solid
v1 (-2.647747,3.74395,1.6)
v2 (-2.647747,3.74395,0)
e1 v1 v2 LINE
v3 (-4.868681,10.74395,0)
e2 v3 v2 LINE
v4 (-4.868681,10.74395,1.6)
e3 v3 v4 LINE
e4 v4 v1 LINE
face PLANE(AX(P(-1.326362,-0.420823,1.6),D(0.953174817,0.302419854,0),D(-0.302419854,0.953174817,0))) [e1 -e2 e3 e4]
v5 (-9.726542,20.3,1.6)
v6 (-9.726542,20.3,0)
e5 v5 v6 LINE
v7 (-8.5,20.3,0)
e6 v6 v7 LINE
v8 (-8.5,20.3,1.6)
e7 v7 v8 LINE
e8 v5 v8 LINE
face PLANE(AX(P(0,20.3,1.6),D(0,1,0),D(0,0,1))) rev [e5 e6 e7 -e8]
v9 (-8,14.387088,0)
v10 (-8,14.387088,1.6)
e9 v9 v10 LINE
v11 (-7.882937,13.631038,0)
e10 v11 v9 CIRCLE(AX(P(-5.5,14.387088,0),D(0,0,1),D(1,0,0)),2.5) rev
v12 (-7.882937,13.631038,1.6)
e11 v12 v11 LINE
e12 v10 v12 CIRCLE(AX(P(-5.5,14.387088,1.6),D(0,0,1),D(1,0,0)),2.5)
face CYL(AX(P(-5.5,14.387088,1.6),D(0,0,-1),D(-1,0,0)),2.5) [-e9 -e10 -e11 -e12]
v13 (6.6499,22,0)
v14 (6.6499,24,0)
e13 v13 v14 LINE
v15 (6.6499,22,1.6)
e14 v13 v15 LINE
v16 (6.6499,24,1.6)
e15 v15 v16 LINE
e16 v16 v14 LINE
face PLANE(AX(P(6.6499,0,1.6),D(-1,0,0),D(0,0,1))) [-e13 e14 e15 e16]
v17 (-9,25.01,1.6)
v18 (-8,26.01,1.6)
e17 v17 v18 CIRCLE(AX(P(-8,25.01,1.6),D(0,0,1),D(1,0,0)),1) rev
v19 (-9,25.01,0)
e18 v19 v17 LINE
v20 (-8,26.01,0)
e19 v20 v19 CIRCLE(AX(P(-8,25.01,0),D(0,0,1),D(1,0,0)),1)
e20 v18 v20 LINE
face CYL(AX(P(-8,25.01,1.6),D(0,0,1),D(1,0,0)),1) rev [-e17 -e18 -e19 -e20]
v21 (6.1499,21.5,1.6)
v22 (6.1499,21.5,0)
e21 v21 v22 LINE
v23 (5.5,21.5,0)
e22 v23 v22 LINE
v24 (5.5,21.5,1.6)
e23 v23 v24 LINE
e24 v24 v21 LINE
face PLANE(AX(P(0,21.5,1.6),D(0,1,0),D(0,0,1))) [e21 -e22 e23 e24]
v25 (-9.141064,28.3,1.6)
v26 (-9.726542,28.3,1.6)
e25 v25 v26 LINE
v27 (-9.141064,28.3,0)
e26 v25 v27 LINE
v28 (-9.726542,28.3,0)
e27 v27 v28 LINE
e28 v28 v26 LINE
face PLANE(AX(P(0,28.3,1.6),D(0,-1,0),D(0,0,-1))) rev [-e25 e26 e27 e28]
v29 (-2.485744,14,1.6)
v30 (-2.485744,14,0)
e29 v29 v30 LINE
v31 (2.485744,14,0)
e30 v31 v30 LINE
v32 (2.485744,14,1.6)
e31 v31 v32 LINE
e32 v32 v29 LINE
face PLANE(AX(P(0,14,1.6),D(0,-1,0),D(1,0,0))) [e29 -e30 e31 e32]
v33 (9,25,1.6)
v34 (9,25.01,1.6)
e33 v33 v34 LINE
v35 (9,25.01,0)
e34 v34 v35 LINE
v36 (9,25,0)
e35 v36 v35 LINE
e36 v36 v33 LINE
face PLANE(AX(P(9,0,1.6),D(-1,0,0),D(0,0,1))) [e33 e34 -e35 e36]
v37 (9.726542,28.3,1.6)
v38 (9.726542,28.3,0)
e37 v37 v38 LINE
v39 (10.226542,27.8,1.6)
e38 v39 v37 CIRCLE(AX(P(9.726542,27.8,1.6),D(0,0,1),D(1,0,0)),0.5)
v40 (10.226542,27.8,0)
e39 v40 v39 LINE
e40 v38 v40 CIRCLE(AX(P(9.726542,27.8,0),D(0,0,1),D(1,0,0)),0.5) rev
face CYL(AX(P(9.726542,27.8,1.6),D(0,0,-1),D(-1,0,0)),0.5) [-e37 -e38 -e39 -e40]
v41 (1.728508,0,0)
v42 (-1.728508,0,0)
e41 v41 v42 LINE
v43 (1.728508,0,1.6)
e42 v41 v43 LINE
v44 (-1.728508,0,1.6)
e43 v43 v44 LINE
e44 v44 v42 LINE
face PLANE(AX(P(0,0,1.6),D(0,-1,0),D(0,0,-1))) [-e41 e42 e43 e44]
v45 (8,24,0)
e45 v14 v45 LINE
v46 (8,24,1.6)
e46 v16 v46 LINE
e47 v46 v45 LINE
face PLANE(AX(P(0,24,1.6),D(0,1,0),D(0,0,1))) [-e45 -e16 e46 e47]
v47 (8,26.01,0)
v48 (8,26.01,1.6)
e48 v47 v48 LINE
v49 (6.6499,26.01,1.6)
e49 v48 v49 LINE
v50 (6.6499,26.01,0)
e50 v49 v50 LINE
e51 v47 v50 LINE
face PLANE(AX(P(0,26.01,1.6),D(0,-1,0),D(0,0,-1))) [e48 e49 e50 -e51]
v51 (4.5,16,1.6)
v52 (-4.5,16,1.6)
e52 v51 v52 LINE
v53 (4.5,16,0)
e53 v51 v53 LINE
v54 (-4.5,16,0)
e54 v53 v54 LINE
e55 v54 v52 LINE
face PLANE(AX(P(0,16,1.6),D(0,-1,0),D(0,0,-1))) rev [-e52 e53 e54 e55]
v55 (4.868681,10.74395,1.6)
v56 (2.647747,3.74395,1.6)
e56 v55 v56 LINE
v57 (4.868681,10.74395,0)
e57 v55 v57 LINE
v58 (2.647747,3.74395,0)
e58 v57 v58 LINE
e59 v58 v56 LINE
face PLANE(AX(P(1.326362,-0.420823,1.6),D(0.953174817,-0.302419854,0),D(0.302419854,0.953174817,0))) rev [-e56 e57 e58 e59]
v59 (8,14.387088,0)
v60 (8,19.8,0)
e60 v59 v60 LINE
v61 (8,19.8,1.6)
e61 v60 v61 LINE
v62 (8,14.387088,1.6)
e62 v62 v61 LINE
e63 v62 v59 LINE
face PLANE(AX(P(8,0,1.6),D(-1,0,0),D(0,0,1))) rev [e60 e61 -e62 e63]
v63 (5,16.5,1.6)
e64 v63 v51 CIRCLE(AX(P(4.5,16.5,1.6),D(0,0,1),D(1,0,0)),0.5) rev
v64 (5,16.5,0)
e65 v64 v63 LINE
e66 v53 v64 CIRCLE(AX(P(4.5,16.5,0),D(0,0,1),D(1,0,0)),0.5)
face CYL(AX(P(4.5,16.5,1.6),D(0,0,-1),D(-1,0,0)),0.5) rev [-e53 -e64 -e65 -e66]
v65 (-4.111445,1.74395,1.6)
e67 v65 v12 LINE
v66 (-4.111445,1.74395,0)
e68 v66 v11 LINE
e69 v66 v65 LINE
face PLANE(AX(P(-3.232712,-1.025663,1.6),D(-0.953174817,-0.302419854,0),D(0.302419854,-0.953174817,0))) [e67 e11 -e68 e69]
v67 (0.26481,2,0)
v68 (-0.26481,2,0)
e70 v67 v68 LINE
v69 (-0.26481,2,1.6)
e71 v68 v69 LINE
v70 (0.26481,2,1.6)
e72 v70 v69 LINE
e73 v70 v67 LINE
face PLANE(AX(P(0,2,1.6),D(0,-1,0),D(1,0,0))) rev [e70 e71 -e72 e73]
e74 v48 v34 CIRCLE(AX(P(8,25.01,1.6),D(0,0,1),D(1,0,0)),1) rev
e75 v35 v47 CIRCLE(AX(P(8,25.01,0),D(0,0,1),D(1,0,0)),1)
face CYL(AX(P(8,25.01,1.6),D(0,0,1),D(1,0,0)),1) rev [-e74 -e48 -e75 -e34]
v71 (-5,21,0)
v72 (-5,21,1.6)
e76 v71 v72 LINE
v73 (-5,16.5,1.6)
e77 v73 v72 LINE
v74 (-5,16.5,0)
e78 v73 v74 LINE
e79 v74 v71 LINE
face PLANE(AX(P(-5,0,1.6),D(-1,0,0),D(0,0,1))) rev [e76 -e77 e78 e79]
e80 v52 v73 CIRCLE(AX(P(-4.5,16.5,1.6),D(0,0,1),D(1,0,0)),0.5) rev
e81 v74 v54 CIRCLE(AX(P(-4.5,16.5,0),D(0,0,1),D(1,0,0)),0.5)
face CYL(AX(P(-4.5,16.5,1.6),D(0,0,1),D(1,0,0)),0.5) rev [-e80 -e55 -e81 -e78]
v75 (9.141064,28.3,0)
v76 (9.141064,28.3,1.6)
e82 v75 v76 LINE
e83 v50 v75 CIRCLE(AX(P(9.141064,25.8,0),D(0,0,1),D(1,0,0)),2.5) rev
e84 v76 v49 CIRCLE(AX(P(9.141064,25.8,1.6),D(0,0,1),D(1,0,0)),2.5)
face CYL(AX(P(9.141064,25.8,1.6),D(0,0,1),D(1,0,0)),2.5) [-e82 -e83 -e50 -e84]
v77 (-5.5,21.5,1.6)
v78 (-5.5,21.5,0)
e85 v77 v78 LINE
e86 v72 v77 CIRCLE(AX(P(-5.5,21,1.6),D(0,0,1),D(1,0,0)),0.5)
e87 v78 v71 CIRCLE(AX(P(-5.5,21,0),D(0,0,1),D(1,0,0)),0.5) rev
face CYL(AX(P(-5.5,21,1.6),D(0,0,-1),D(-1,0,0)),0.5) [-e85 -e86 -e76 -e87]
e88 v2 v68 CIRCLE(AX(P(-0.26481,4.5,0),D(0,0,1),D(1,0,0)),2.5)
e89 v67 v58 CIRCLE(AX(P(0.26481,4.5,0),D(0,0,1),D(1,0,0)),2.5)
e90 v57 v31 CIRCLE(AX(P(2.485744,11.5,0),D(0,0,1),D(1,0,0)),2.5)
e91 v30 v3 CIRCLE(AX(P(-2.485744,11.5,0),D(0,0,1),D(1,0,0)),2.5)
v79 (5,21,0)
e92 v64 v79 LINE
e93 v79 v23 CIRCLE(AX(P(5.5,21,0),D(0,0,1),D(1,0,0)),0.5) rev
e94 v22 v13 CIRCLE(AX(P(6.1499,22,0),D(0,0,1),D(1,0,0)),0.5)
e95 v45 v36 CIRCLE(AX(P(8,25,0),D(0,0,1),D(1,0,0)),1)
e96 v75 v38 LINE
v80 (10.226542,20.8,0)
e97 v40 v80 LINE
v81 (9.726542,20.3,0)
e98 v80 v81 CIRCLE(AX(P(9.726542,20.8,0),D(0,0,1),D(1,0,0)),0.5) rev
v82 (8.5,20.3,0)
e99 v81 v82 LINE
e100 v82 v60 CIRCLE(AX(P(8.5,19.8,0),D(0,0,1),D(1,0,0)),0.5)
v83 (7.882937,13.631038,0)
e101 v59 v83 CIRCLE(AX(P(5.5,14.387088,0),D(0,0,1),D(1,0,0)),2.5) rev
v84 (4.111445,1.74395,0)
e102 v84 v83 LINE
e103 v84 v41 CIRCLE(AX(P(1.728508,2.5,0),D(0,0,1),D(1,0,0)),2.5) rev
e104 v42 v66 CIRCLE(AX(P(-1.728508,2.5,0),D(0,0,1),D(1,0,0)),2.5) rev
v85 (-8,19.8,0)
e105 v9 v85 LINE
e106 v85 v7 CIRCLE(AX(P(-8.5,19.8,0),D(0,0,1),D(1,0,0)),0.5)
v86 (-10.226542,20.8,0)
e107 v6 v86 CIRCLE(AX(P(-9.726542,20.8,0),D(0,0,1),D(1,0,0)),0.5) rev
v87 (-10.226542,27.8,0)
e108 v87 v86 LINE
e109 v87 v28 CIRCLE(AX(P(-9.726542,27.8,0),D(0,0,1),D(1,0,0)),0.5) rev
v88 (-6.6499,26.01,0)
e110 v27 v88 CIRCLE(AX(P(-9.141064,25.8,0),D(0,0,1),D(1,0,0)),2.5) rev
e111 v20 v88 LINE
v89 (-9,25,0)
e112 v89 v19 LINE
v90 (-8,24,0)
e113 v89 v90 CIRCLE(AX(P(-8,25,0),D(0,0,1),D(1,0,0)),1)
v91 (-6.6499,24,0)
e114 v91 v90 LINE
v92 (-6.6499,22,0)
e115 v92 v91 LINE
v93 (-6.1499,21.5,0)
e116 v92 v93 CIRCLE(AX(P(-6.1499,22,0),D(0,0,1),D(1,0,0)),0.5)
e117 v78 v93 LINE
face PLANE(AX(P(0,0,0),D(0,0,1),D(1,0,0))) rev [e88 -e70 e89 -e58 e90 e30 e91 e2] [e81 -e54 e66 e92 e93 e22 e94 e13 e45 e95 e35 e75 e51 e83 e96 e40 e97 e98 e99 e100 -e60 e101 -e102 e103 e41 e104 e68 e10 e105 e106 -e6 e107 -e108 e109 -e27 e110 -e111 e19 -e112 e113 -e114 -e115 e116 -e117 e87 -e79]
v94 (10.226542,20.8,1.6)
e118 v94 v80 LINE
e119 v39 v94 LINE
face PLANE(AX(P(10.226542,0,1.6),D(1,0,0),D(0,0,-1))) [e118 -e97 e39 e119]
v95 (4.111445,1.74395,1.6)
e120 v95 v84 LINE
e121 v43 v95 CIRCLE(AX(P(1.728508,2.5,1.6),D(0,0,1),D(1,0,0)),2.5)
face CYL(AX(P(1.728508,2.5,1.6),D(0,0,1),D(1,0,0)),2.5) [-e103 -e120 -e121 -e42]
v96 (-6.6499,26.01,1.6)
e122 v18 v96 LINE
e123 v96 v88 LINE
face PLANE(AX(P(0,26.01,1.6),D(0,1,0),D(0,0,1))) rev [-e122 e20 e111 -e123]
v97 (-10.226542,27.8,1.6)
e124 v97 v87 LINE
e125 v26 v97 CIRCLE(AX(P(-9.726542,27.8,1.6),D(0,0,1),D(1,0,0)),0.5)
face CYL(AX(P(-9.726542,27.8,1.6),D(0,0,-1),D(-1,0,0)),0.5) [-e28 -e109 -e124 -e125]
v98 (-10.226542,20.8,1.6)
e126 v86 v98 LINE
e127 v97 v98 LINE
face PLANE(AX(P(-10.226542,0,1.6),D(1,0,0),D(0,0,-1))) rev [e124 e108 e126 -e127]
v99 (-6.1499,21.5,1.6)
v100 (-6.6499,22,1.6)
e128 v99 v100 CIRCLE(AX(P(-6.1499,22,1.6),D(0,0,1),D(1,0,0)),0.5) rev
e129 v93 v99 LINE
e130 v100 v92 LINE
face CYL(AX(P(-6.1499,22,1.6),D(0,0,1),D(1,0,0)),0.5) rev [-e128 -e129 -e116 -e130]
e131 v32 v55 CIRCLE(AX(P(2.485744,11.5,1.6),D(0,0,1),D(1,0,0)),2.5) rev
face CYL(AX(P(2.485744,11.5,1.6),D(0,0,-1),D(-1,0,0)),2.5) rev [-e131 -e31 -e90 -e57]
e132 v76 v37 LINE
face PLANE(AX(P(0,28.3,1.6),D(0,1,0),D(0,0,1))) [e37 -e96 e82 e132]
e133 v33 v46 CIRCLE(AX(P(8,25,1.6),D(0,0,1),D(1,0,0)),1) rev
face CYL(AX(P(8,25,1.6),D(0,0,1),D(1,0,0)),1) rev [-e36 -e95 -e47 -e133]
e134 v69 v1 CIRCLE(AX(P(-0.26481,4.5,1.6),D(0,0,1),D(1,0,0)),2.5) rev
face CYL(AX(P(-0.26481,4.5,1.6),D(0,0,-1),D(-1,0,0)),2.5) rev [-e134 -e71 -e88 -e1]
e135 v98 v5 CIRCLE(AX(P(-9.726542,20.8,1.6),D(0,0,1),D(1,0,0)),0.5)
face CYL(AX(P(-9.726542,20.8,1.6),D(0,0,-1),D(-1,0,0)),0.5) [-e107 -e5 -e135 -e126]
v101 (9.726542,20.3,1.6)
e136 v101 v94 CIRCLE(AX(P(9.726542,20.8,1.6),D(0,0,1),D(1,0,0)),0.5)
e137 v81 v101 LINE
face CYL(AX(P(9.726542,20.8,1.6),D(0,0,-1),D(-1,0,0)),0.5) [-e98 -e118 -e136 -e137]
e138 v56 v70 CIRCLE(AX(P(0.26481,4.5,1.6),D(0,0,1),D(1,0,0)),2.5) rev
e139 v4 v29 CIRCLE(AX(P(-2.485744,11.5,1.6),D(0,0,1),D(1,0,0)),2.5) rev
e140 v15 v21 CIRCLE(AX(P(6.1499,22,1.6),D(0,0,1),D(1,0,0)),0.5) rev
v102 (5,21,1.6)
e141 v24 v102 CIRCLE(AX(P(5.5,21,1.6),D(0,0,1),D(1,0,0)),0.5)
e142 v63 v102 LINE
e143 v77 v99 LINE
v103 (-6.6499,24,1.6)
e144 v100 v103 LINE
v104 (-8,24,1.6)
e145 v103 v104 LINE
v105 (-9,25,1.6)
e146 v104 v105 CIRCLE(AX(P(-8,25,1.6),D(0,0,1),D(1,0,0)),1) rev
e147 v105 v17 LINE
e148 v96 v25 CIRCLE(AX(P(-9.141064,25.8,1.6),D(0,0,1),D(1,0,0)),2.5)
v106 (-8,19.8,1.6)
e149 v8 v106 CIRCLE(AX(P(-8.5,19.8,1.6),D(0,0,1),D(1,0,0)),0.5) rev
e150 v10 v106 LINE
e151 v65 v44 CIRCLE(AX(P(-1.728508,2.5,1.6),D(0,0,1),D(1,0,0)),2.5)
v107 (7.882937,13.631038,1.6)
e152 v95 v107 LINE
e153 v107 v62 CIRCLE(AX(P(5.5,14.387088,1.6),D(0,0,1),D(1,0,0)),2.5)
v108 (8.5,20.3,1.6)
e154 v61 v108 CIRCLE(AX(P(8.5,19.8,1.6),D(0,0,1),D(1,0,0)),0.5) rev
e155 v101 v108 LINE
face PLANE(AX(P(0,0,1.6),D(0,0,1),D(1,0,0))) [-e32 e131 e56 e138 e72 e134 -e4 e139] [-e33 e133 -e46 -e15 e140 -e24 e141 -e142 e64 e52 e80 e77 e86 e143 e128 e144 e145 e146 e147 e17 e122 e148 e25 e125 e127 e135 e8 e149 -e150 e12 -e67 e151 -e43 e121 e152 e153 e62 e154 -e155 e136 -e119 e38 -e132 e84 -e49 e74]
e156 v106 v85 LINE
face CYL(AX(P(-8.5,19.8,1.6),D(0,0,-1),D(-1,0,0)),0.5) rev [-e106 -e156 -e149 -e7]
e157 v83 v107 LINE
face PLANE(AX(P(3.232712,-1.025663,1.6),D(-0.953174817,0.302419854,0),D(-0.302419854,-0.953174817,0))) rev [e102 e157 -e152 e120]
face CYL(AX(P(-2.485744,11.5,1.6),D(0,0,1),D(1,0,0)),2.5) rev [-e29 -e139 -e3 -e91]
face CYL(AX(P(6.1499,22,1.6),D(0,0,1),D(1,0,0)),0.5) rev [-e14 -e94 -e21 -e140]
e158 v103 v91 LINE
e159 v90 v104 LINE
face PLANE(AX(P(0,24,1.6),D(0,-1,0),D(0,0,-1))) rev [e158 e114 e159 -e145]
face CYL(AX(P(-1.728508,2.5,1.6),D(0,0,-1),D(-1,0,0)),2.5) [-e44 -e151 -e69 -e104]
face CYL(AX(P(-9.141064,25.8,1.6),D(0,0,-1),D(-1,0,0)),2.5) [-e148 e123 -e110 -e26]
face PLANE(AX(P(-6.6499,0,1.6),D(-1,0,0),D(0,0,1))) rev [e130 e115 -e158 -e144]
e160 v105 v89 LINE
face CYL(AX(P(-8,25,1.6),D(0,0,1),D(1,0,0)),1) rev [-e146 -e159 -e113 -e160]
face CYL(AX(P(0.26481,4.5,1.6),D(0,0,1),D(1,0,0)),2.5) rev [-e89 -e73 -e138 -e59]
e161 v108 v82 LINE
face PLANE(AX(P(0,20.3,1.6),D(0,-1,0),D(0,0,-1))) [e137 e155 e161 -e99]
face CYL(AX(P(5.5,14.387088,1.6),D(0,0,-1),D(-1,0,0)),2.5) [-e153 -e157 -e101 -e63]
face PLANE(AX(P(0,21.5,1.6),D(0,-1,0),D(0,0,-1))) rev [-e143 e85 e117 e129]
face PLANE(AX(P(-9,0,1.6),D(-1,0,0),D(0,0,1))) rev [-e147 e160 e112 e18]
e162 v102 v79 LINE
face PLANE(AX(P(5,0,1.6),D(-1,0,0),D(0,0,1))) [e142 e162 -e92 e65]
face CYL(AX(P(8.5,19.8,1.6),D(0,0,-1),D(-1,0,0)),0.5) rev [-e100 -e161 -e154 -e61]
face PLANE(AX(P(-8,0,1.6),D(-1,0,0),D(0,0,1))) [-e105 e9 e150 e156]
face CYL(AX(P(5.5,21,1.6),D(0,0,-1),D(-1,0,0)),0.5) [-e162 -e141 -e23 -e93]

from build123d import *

# Parameters (mm, degrees)
BOSS_EXTRUDE1_DEPTH = 1.6
FILLET7_R           = 0.5
FILLET8_R           = 2.5
FILLET9_R           = 2.5
MIRROR1_DEPTH       = 1.6
FILLET10_R          = 1


# Read off the part's stored shape, not the designer's step: Mirror1
with BuildPart() as part:
    # Sketch1 → Boss-Extrude1 (new body)
    with BuildSketch(Plane.XY):
        Polygon((5, 16), (0, 16), (0, 14), (5.901749013, 14), (2.094432467, 2), (0, 2), (0, 0), (3.558130696, 0), (8, 14), (8, 20.3), (10.226542067, 20.3), (10.226542067, 28.3), (6.6499, 28.3), (6.6499, 26.01), (9, 26.01), (9, 24), (6.6499, 24), (6.6499, 21.5), (5, 21.5), align=None)
    extrude(amount=BOSS_EXTRUDE1_DEPTH)

    # Fillet7
    fillet7_edges = [part.edges().sort_by_distance(p)[0] for p in [
        (5, 16, 0.8),
        (5, 21.5, 0.8),
        (6.6499, 21.5, 0.8),
        (10.226542067, 28.3, 0.8),
        (10.226542067, 20.3, 0.8),
        (8, 20.3, 0.8),
    ]]
    fillet(fillet7_edges, radius=FILLET7_R)

    # Fillet8
    # the kernel refuses this fillet: 2.5 mm, written as the material it takes off along each edge
    with BuildSketch(Plane(origin=(6.6499, 28.3, -6.227910966), x_dir=(0, -1, 0), z_dir=(0, 0, 1))) as fillet8_piece_1:
        with BuildLine():
            CenterArc((2.5, 2.491164386), FILLET8_R, 180, 85.181476567)
            Line((0, 2.491164386), (-0.05, 2.491164386))
            Line((-0.05, 2.491164386), (-0.05, 0))
            Line((-0.05, 0), (0, -0.05))
            ThreePointArc((0, -0.05), (1.145, -0.05), (2.2858, -0.049823288))
            Line((2.2858, -0.049823288), (2.29, 0))
        make_face()
    extrude(amount=14.055821932, mode=Mode.SUBTRACT)

    # Fillet9
    fillet9_edges = [part.edges().sort_by_distance(p)[0] for p in [
        (8, 14, 0.8),
        (3.558130696, 0, 0.8),
        (2.094432467, 2, 0.8),
        (5.901749013, 14, 0.8),
    ]]
    fillet(fillet9_edges, radius=FILLET9_R)

    # Mirror1 outline → Mirror1 (add)
    with BuildSketch(Plane.XY):
        with BuildLine():
            Line((0, 16), (-4.5, 16))
            ThreePointArc((-4.5, 16), (-4.853553391, 16.146446609), (-5, 16.5))
            Line((-5, 16.5), (-5, 21))
            ThreePointArc((-5, 21), (-5.146446609, 21.353553391), (-5.5, 21.5))
            Line((-5.5, 21.5), (-6.1499, 21.5))
            ThreePointArc((-6.1499, 21.5), (-6.503453391, 21.646446609), (-6.6499, 22))
            Line((-6.6499, 22), (-6.6499, 24))
            Line((-6.6499, 24), (-9, 24))
            Line((-9, 24), (-9, 26.01))
            Line((-9, 26.01), (-6.6499, 26.01))
            ThreePointArc((-6.6499, 26.01), (-7.449171955, 27.640516232), (-9.141064386, 28.3))
            Line((-9.141064386, 28.3), (-9.726542067, 28.3))
            ThreePointArc((-9.726542067, 28.3), (-10.080095458, 28.153553391), (-10.226542067, 27.8))
            Line((-10.226542067, 27.8), (-10.226542067, 20.8))
            ThreePointArc((-10.226542067, 20.8), (-10.080095458, 20.44644661), (-9.726542067, 20.3))
            Line((-9.726542067, 20.3), (-8.5, 20.3))
            ThreePointArc((-8.5, 20.3), (-8.146446609, 20.153553391), (-8, 19.8))
            Line((-8, 19.8), (-8, 14.38708754))
            ThreePointArc((-8, 14.38708754), (-7.970560929, 14.004558199), (-7.882937042, 13.631037905))
            Line((-7.882937042, 13.631037905), (-4.111444952, 1.743950364))
            ThreePointArc((-4.111444952, 1.743950364), (-3.204969205, 0.482560523), (-1.72850791, 0))
            Line((-1.72850791, 0), (0, 0))
            Line((0, 0), (0, 2))
            Line((0, 2), (-0.264809681, 2))
            ThreePointArc((-0.264809681, 2), (-1.741270976, 2.482560523), (-2.647746723, 3.743950364))
            Line((-2.647746723, 3.743950364), (-4.868681376, 10.743950364))
            ThreePointArc((-4.868681376, 10.743950364), (-4.503183811, 12.976461295), (-2.485744333, 14))
            Line((-2.485744333, 14), (0, 14))
            Line((0, 14), (0, 16))
        make_face()
    extrude(amount=MIRROR1_DEPTH)

    # Fillet10
    fillet10_edges = [part.edges().sort_by_distance(p)[0] for p in [
        (-9, 24, 0.8),
        (-9, 26.01, 0.8),
        (9, 24, 0.8),
        (9, 26.01, 0.8),
    ]]
    fillet(fillet10_edges, radius=FILLET10_R)


solid = part.part
